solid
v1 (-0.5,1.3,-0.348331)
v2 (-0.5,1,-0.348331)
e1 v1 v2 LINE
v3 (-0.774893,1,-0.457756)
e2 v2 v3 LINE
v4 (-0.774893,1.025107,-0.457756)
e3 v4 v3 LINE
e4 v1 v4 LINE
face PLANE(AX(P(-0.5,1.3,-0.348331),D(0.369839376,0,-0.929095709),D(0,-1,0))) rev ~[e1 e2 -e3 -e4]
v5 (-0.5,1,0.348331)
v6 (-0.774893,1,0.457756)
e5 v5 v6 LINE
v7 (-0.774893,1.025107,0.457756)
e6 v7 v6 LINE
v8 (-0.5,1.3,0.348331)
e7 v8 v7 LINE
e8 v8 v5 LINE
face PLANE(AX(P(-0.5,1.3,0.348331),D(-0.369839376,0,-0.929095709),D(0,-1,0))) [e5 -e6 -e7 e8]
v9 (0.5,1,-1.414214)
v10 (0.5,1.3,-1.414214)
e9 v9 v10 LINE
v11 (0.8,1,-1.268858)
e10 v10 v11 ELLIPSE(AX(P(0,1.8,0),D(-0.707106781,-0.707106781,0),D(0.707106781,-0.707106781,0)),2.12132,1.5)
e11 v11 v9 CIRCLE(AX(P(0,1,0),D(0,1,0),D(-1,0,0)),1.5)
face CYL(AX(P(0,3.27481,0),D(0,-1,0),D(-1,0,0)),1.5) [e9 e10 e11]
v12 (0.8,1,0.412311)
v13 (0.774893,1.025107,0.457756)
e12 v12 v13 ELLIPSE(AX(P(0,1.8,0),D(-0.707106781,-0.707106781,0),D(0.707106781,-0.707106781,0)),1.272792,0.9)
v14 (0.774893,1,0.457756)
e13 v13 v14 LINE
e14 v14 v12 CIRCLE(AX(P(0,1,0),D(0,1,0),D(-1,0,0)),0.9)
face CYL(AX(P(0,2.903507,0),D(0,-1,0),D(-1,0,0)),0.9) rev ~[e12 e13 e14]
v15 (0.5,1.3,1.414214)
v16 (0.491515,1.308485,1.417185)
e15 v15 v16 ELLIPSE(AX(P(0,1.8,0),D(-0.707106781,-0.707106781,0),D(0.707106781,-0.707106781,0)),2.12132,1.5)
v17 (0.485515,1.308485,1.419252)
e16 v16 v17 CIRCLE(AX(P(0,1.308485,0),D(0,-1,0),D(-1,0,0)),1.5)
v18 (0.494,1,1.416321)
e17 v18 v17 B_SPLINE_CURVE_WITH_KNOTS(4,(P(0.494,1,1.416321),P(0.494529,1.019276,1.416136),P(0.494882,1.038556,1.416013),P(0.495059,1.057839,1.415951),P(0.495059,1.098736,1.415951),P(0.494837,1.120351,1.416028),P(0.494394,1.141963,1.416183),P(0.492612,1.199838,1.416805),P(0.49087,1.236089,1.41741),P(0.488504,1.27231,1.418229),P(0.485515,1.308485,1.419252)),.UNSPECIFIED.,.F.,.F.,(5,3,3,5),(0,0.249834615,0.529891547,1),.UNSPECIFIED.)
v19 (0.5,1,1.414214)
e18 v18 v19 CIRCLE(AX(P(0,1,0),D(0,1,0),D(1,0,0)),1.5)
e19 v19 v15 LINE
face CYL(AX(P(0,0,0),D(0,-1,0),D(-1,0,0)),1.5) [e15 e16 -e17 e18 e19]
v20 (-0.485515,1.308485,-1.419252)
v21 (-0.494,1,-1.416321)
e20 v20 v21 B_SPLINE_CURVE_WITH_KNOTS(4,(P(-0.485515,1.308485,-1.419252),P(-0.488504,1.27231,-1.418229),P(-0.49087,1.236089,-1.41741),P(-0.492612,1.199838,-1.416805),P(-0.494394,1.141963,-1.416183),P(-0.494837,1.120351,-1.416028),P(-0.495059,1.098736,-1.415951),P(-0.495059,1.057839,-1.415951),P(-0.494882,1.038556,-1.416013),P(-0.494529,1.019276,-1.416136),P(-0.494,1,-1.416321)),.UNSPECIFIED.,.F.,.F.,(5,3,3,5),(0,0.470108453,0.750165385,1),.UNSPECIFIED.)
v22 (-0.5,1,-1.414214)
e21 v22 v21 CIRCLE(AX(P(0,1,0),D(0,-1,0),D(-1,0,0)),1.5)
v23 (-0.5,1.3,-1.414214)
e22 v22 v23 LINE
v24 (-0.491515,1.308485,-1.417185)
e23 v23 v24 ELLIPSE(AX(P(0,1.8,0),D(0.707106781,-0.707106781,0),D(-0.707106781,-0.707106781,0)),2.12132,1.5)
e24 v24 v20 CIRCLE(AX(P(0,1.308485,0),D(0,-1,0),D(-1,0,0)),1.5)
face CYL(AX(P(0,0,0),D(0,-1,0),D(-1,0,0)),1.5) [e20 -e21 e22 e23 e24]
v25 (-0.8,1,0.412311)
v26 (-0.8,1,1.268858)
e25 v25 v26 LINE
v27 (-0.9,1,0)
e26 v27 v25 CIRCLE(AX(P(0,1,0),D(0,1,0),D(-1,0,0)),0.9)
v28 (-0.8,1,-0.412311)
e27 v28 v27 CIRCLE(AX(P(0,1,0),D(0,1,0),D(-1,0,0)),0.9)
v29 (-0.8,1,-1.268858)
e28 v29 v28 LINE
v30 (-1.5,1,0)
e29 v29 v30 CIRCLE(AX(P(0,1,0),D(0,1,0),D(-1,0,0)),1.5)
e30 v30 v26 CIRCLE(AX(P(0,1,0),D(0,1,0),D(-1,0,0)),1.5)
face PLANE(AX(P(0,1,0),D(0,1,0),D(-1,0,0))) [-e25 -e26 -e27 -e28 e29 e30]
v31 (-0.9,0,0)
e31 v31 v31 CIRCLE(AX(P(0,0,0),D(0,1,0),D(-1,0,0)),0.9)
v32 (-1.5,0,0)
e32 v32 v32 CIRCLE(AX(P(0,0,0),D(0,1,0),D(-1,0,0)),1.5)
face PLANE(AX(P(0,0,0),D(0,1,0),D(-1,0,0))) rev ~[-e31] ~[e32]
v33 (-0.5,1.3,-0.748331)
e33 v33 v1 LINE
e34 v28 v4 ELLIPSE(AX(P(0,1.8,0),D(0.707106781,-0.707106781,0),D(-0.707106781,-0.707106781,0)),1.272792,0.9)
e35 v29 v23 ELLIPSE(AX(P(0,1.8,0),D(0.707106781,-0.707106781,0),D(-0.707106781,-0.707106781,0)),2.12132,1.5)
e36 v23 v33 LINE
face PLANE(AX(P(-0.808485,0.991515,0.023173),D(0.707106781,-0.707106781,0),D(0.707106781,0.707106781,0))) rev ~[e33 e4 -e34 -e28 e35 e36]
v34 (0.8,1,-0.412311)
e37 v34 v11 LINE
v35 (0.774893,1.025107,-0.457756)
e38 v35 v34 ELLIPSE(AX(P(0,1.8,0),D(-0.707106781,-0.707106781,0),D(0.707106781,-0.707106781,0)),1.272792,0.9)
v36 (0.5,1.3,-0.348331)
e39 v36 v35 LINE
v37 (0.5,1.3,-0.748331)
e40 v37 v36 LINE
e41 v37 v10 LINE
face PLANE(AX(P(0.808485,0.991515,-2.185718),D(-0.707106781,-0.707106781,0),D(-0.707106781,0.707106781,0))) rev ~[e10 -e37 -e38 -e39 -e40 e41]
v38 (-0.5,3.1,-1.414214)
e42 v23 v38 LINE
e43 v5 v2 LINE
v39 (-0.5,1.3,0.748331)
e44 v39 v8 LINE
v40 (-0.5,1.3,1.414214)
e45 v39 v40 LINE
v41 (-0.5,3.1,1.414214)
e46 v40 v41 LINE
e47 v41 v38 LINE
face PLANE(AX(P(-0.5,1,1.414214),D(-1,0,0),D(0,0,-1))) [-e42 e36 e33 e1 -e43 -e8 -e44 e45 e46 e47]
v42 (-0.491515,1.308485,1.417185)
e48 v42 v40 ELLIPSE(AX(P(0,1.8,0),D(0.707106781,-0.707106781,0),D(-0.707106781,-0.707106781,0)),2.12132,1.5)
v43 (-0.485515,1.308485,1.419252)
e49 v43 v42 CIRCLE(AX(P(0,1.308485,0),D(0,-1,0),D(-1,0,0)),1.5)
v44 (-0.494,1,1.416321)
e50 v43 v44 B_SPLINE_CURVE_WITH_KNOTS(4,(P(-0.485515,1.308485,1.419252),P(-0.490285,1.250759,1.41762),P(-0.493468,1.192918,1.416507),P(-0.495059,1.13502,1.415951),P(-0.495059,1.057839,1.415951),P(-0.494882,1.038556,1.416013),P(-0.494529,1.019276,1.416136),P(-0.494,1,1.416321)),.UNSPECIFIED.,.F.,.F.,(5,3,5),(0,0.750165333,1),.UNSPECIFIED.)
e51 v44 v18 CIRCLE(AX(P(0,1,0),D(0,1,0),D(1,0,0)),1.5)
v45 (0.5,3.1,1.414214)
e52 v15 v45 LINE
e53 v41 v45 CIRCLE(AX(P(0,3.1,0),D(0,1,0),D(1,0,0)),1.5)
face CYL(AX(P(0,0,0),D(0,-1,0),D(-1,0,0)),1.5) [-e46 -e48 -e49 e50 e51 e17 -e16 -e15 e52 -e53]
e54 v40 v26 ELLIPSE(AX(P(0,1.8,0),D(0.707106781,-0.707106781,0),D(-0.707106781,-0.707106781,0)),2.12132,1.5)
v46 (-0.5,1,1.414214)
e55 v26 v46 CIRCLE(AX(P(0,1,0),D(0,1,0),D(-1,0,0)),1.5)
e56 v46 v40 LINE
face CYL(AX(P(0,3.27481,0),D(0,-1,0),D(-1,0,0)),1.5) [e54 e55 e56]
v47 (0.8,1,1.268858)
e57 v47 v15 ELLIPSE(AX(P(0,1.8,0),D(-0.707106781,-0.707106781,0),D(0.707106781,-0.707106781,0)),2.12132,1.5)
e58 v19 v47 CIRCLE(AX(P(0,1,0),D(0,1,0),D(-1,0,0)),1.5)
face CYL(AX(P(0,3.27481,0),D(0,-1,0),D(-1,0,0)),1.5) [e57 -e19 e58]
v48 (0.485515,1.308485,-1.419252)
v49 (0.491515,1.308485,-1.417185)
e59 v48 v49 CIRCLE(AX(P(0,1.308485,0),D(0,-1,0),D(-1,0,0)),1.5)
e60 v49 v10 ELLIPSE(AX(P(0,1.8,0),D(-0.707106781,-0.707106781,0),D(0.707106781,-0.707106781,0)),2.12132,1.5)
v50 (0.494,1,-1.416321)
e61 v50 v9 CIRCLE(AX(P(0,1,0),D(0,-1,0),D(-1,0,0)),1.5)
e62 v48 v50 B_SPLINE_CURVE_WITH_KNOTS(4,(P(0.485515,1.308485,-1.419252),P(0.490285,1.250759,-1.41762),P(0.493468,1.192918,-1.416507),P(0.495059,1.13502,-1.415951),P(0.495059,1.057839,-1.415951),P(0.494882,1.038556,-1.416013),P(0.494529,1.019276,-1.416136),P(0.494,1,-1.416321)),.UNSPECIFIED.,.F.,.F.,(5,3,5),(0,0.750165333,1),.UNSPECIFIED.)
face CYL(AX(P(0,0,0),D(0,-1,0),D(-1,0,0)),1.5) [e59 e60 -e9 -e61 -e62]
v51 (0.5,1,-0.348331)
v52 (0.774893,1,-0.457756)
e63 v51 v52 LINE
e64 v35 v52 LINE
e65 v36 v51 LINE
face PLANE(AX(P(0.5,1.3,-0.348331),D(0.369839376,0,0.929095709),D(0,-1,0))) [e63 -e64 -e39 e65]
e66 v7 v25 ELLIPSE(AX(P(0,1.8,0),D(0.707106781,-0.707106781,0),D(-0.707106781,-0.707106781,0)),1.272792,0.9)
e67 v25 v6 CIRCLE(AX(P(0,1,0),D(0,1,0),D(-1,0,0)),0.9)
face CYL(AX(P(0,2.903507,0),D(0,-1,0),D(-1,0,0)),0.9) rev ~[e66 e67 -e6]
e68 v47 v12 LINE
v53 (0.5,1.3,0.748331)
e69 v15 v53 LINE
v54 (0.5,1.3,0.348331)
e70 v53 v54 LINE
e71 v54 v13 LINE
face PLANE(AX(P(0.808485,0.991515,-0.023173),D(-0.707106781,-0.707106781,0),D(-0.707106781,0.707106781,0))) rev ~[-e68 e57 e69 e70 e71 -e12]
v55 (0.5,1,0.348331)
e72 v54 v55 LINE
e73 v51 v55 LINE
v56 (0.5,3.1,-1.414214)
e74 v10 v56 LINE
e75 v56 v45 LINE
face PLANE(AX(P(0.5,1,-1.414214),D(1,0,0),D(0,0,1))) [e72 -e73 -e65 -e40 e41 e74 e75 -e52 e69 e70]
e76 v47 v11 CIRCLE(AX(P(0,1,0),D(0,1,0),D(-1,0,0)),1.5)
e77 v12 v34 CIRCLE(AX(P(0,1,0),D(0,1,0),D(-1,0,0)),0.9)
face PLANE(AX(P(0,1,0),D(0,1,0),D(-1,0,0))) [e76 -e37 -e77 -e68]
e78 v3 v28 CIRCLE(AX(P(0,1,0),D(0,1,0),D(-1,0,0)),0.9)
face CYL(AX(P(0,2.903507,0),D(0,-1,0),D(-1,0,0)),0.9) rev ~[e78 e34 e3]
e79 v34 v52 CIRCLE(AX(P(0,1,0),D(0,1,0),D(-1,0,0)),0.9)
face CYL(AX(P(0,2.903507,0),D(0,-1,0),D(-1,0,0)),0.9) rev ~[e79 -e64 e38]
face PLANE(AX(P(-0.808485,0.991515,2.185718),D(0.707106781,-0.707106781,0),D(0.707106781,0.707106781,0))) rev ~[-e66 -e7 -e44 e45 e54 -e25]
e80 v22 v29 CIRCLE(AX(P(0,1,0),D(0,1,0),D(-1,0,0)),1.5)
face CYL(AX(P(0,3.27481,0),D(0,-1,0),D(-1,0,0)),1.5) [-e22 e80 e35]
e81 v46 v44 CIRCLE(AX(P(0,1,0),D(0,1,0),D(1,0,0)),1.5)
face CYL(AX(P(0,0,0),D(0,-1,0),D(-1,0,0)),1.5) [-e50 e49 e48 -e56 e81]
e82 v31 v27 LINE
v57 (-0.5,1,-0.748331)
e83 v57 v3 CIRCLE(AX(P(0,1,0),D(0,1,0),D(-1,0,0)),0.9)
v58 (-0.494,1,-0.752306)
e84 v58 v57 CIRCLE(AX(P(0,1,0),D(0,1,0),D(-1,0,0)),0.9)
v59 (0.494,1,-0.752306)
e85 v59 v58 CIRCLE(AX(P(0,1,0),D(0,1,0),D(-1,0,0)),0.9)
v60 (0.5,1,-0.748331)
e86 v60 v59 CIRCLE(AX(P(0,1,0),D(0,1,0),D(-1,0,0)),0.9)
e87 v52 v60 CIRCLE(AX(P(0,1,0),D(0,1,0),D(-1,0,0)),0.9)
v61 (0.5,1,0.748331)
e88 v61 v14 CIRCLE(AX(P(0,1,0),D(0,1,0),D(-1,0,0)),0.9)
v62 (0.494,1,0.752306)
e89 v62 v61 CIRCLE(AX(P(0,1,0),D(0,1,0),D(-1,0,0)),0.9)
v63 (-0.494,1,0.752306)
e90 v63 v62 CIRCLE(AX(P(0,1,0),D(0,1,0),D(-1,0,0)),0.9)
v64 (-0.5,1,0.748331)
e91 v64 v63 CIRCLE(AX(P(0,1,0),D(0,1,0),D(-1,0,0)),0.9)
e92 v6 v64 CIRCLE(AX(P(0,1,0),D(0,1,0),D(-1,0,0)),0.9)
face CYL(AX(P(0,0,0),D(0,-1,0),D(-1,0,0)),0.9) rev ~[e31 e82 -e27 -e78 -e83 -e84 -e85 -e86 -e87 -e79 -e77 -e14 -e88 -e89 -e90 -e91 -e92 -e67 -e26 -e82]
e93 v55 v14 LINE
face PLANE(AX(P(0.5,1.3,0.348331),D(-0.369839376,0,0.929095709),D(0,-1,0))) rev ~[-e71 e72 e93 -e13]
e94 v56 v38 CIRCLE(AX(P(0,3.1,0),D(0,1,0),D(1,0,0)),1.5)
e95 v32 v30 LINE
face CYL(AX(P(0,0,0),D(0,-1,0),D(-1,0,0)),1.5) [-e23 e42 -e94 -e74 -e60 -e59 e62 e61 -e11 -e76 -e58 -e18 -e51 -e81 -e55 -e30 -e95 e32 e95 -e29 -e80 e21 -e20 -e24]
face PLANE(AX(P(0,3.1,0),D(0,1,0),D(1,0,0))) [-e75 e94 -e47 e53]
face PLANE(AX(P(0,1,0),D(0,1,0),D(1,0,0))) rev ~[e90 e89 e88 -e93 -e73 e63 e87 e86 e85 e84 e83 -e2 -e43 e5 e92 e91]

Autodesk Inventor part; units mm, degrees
ref_plane "YZ Plane" through (0, 0, 0) normal (1, 0, 0) x (0, 1, 0)
ref_plane "XZ Plane" through (0, 0, 0) normal (0, 1, 0) x (-1, 0, 0)
ref_plane "XY Plane" through (0, 0, 0) normal (0, 0, 1) x (1, 0, 0)
sketch "스케치2" plane through (0, 0, 0) normal (0, 1, 0) x (-1, 0, 0)
  circle A0 centre (0, 0) radius 1.5
  circle A1 centre (0, 0) radius 0.9
  dimension "d0" = 3
  dimension "d6" = 1.8
extrude "돌출1" add sketch "스케치2" along normal blind 1
sketch "스케치4" plane through (0, 1, 0) normal (0, 1, 0) x (1, 0, 0)
  line L0 (0.5, -1.55) -> (-0.5, -1.55)
  line L1 (-0.5, -1.55) -> (-0.5, 1.55)
  line L2 (-0.5, 1.55) -> (0.5, 1.55)
  line L3 (0.5, 1.55) -> (0.5, -1.55)
  line L4 (0.5, -1.55) -> (-0.5, 1.55) construction
  line L5 (-0.5, -1.55) -> (0.5, 1.55) construction
  circle A0 centre (0, 0) radius 1.5 projected
  point P0 (0.5, 1.4142)
  point P1 (-0.5, 1.4142)
  point P2 (-0.5, -1.4142)
  point P3 (0.5, -1.4142)
  dimension "d7" = 1
extrude "돌출3" add sketch "스케치4" along normal blind 2.1 contours A0 L1 L3
chamfer "모따기1" distance 0.3 angle 45 4 edges at (0.5, 1, 1.0813) (0.5, 1, -1.0813) (-0.5, 1, -1.0813) (-0.5, 1, 1.0813)
chamfer "모따기2" distance 0.4 angle 45 4 edges at (-0.5, 1.15, -0.7483) (-0.5, 1.15, 0.7483) (0.5, 1.15, 0.7483) (0.5, 1.15, -0.7483)
properties part number "bone_attachment_3.0mm_test"
